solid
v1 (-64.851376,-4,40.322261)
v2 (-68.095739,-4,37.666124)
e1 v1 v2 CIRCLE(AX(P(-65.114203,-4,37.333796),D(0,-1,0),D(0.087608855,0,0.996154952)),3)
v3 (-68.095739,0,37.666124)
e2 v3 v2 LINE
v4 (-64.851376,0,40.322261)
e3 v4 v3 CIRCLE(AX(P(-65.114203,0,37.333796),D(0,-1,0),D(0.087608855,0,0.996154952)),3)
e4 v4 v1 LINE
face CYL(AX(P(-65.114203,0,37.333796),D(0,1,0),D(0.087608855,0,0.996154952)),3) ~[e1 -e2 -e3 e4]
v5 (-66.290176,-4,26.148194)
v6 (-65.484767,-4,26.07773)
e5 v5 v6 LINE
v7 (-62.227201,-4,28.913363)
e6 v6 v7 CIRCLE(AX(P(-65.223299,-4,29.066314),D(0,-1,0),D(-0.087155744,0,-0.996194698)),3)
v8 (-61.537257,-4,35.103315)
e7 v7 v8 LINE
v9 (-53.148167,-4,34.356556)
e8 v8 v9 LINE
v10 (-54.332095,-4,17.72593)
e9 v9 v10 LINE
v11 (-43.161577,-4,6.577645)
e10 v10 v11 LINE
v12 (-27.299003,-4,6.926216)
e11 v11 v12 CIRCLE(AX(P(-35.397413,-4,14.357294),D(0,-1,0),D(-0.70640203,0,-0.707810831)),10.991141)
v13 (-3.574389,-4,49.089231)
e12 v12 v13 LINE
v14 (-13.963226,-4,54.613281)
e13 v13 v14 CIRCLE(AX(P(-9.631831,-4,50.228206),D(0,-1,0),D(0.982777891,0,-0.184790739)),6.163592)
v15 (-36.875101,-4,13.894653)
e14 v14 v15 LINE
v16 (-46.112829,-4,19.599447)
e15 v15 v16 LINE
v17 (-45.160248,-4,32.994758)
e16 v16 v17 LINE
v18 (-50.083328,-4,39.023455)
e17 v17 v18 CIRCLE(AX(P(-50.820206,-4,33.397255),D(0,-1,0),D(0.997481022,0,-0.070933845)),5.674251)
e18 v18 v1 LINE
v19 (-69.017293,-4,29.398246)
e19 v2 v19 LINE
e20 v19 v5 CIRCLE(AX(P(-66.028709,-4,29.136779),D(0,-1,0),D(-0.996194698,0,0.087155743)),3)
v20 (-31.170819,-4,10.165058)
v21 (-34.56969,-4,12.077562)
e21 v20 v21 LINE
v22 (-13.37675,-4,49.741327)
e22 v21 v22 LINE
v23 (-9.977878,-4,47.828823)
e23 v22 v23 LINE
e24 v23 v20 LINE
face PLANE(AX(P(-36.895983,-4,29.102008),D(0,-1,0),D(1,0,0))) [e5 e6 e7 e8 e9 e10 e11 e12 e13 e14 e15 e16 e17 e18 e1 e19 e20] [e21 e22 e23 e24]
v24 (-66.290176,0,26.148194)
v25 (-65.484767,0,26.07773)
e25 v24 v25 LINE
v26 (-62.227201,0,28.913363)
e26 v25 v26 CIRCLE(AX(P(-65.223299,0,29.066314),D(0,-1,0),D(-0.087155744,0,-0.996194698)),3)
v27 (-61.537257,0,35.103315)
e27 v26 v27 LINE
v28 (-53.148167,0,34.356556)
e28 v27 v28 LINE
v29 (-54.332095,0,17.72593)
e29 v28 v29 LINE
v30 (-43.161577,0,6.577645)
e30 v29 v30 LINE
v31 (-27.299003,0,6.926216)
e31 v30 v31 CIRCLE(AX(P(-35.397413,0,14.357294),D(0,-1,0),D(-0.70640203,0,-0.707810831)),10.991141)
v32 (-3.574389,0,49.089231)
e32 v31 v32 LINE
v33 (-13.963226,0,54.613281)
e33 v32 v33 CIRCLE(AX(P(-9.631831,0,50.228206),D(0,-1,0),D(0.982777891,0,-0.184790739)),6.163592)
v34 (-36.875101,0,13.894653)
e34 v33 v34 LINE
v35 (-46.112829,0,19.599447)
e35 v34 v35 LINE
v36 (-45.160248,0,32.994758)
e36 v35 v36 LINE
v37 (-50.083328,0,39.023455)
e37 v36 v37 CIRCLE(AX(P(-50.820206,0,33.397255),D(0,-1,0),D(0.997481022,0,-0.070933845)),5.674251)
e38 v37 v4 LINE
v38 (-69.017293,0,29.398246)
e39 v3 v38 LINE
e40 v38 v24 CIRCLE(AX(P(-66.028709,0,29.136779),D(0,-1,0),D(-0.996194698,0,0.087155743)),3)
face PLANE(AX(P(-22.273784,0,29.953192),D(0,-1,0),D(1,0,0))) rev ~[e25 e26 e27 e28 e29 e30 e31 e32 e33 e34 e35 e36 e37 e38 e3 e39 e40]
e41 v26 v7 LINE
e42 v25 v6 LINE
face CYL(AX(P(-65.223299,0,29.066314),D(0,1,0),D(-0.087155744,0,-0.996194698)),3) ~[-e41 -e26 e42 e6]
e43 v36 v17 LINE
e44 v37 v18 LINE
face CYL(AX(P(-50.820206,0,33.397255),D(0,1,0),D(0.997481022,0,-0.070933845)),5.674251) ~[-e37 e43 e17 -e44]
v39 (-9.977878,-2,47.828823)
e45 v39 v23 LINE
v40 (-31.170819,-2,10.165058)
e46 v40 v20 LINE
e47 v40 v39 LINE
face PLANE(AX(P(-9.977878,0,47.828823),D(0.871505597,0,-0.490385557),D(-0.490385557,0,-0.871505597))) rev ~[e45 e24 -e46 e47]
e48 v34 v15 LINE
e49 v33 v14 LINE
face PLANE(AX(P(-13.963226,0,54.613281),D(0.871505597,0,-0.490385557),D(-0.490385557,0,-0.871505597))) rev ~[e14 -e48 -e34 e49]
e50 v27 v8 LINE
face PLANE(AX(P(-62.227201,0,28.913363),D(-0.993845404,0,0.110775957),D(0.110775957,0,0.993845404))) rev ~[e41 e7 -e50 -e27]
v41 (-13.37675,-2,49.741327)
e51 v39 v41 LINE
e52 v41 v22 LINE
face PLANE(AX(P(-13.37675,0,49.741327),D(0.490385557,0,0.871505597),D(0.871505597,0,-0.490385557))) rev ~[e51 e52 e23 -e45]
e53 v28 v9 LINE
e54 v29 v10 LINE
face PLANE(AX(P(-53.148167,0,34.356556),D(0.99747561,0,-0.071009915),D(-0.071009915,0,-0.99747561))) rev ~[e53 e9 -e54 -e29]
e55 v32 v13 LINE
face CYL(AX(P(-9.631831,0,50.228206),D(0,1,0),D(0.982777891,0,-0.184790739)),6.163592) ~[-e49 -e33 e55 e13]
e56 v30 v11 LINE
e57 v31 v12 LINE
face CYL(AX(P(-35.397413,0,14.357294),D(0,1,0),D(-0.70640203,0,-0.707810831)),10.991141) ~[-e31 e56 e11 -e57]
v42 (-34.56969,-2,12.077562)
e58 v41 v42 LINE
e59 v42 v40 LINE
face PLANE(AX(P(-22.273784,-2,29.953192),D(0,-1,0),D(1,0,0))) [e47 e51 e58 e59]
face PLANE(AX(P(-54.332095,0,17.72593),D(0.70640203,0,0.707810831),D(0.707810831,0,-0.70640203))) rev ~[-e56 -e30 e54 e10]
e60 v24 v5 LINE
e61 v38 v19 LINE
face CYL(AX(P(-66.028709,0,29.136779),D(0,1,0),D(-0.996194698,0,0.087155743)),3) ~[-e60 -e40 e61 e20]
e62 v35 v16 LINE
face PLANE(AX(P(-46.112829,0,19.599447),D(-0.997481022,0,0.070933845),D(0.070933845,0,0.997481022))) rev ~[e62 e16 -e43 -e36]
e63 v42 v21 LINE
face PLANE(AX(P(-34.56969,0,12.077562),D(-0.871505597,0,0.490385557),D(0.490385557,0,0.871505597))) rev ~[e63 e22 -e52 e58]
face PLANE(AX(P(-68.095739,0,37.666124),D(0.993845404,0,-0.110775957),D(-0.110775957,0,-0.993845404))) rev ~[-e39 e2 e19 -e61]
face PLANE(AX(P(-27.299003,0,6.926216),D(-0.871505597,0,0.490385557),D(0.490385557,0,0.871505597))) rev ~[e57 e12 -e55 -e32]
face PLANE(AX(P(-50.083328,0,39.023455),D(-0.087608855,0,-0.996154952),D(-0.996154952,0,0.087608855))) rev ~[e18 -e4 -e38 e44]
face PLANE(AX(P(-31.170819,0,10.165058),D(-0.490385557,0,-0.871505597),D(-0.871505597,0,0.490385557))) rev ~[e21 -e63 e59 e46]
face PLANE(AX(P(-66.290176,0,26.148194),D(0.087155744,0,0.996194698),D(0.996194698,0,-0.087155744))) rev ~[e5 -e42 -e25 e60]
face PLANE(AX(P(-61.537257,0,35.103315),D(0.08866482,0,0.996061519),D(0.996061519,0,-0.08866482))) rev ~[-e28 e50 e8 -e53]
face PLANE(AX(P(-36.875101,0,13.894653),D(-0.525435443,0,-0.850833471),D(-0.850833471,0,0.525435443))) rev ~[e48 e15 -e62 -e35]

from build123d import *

# Parameters (mm, degrees)
F1_DEPTH = 4
F2_DEPTH = 2


# Not quite as in the source:
# - a feature names something its author has since deleted; it is built from what else it names


with BuildPart() as f1:
    # F0 (on Front) → F1 (new body)
    with BuildSketch(Plane.XZ):
        with BuildLine():
            ThreePointArc((-69.017292897, 29.3982457694), (-68.3268421331, 27.2084157133), (-66.290176034, 26.1481944472))
            Line((-66.290176034, 26.1481944472), (-65.4847666663, 26.0777302572))
            ThreePointArc((-65.4847666663, 26.0777302572), (-63.2535898646, 26.8035186892), (-62.2272009721, 28.913363378))
            Line((-62.2272009721, 28.913363378), (-61.5372568785, 35.1033145465))
            Line((-61.5372568785, 35.1033145465), (-53.1481667688, 34.3565562926))
            Line((-53.1481667688, 34.3565562926), (-54.3320948451, 17.7259296179))
            Line((-54.3320948451, 17.7259296179), (-43.1615771204, 6.577645293))
            ThreePointArc((-43.1615771204, 6.577645293), (-35.1559477392, 3.3688057895), (-27.2990026255, 6.9262158348))
            Line((-27.2990026255, 6.9262158348), (-3.5743886341, 49.0892314075))
            ThreePointArc((-3.5743886341, 49.0892314075), (-6.738115065, 55.6702900526), (-13.9632260986, 54.6132808892))
            Line((-13.9632260986, 54.6132808892), (-36.8751008064, 13.8946529478))
            Line((-36.8751008064, 13.8946529478), (-46.112828888, 19.5994470268))
            Line((-46.112828888, 19.5994470268), (-45.1602484403, 32.9947581421))
            ThreePointArc((-45.1602484403, 32.9947581421), (-46.4251891271, 36.9862585641), (-50.0833280385, 39.0234552324))
            Line((-50.0833280385, 39.0234552324), (-64.8513762012, 40.3222609912))
            ThreePointArc((-64.8513762012, 40.3222609912), (-67.0146267862, 39.6550864105), (-68.0957389782, 37.666124007))
            Line((-68.0957389782, 37.666124007), (-69.017292897, 29.3982457694))
        make_face()
        Polygon((-9.9778777986, 47.8288231225), (-31.1708185564, 10.1650579072), (-34.5696903843, 12.0775615796), (-13.3767496278, 49.7413267956), align=None, mode=Mode.SUBTRACT)
    extrude(amount=F1_DEPTH)

    # F0 (on Front) → F2 (join)
    with BuildSketch(Plane.XZ):
        Polygon((-34.5696903843, 12.0775615796), (-31.1708185564, 10.1650579072), (-9.9778777986, 47.8288231225), (-13.3767496278, 49.7413267956), align=None)
    extrude(amount=F2_DEPTH)


solid = f1.part
